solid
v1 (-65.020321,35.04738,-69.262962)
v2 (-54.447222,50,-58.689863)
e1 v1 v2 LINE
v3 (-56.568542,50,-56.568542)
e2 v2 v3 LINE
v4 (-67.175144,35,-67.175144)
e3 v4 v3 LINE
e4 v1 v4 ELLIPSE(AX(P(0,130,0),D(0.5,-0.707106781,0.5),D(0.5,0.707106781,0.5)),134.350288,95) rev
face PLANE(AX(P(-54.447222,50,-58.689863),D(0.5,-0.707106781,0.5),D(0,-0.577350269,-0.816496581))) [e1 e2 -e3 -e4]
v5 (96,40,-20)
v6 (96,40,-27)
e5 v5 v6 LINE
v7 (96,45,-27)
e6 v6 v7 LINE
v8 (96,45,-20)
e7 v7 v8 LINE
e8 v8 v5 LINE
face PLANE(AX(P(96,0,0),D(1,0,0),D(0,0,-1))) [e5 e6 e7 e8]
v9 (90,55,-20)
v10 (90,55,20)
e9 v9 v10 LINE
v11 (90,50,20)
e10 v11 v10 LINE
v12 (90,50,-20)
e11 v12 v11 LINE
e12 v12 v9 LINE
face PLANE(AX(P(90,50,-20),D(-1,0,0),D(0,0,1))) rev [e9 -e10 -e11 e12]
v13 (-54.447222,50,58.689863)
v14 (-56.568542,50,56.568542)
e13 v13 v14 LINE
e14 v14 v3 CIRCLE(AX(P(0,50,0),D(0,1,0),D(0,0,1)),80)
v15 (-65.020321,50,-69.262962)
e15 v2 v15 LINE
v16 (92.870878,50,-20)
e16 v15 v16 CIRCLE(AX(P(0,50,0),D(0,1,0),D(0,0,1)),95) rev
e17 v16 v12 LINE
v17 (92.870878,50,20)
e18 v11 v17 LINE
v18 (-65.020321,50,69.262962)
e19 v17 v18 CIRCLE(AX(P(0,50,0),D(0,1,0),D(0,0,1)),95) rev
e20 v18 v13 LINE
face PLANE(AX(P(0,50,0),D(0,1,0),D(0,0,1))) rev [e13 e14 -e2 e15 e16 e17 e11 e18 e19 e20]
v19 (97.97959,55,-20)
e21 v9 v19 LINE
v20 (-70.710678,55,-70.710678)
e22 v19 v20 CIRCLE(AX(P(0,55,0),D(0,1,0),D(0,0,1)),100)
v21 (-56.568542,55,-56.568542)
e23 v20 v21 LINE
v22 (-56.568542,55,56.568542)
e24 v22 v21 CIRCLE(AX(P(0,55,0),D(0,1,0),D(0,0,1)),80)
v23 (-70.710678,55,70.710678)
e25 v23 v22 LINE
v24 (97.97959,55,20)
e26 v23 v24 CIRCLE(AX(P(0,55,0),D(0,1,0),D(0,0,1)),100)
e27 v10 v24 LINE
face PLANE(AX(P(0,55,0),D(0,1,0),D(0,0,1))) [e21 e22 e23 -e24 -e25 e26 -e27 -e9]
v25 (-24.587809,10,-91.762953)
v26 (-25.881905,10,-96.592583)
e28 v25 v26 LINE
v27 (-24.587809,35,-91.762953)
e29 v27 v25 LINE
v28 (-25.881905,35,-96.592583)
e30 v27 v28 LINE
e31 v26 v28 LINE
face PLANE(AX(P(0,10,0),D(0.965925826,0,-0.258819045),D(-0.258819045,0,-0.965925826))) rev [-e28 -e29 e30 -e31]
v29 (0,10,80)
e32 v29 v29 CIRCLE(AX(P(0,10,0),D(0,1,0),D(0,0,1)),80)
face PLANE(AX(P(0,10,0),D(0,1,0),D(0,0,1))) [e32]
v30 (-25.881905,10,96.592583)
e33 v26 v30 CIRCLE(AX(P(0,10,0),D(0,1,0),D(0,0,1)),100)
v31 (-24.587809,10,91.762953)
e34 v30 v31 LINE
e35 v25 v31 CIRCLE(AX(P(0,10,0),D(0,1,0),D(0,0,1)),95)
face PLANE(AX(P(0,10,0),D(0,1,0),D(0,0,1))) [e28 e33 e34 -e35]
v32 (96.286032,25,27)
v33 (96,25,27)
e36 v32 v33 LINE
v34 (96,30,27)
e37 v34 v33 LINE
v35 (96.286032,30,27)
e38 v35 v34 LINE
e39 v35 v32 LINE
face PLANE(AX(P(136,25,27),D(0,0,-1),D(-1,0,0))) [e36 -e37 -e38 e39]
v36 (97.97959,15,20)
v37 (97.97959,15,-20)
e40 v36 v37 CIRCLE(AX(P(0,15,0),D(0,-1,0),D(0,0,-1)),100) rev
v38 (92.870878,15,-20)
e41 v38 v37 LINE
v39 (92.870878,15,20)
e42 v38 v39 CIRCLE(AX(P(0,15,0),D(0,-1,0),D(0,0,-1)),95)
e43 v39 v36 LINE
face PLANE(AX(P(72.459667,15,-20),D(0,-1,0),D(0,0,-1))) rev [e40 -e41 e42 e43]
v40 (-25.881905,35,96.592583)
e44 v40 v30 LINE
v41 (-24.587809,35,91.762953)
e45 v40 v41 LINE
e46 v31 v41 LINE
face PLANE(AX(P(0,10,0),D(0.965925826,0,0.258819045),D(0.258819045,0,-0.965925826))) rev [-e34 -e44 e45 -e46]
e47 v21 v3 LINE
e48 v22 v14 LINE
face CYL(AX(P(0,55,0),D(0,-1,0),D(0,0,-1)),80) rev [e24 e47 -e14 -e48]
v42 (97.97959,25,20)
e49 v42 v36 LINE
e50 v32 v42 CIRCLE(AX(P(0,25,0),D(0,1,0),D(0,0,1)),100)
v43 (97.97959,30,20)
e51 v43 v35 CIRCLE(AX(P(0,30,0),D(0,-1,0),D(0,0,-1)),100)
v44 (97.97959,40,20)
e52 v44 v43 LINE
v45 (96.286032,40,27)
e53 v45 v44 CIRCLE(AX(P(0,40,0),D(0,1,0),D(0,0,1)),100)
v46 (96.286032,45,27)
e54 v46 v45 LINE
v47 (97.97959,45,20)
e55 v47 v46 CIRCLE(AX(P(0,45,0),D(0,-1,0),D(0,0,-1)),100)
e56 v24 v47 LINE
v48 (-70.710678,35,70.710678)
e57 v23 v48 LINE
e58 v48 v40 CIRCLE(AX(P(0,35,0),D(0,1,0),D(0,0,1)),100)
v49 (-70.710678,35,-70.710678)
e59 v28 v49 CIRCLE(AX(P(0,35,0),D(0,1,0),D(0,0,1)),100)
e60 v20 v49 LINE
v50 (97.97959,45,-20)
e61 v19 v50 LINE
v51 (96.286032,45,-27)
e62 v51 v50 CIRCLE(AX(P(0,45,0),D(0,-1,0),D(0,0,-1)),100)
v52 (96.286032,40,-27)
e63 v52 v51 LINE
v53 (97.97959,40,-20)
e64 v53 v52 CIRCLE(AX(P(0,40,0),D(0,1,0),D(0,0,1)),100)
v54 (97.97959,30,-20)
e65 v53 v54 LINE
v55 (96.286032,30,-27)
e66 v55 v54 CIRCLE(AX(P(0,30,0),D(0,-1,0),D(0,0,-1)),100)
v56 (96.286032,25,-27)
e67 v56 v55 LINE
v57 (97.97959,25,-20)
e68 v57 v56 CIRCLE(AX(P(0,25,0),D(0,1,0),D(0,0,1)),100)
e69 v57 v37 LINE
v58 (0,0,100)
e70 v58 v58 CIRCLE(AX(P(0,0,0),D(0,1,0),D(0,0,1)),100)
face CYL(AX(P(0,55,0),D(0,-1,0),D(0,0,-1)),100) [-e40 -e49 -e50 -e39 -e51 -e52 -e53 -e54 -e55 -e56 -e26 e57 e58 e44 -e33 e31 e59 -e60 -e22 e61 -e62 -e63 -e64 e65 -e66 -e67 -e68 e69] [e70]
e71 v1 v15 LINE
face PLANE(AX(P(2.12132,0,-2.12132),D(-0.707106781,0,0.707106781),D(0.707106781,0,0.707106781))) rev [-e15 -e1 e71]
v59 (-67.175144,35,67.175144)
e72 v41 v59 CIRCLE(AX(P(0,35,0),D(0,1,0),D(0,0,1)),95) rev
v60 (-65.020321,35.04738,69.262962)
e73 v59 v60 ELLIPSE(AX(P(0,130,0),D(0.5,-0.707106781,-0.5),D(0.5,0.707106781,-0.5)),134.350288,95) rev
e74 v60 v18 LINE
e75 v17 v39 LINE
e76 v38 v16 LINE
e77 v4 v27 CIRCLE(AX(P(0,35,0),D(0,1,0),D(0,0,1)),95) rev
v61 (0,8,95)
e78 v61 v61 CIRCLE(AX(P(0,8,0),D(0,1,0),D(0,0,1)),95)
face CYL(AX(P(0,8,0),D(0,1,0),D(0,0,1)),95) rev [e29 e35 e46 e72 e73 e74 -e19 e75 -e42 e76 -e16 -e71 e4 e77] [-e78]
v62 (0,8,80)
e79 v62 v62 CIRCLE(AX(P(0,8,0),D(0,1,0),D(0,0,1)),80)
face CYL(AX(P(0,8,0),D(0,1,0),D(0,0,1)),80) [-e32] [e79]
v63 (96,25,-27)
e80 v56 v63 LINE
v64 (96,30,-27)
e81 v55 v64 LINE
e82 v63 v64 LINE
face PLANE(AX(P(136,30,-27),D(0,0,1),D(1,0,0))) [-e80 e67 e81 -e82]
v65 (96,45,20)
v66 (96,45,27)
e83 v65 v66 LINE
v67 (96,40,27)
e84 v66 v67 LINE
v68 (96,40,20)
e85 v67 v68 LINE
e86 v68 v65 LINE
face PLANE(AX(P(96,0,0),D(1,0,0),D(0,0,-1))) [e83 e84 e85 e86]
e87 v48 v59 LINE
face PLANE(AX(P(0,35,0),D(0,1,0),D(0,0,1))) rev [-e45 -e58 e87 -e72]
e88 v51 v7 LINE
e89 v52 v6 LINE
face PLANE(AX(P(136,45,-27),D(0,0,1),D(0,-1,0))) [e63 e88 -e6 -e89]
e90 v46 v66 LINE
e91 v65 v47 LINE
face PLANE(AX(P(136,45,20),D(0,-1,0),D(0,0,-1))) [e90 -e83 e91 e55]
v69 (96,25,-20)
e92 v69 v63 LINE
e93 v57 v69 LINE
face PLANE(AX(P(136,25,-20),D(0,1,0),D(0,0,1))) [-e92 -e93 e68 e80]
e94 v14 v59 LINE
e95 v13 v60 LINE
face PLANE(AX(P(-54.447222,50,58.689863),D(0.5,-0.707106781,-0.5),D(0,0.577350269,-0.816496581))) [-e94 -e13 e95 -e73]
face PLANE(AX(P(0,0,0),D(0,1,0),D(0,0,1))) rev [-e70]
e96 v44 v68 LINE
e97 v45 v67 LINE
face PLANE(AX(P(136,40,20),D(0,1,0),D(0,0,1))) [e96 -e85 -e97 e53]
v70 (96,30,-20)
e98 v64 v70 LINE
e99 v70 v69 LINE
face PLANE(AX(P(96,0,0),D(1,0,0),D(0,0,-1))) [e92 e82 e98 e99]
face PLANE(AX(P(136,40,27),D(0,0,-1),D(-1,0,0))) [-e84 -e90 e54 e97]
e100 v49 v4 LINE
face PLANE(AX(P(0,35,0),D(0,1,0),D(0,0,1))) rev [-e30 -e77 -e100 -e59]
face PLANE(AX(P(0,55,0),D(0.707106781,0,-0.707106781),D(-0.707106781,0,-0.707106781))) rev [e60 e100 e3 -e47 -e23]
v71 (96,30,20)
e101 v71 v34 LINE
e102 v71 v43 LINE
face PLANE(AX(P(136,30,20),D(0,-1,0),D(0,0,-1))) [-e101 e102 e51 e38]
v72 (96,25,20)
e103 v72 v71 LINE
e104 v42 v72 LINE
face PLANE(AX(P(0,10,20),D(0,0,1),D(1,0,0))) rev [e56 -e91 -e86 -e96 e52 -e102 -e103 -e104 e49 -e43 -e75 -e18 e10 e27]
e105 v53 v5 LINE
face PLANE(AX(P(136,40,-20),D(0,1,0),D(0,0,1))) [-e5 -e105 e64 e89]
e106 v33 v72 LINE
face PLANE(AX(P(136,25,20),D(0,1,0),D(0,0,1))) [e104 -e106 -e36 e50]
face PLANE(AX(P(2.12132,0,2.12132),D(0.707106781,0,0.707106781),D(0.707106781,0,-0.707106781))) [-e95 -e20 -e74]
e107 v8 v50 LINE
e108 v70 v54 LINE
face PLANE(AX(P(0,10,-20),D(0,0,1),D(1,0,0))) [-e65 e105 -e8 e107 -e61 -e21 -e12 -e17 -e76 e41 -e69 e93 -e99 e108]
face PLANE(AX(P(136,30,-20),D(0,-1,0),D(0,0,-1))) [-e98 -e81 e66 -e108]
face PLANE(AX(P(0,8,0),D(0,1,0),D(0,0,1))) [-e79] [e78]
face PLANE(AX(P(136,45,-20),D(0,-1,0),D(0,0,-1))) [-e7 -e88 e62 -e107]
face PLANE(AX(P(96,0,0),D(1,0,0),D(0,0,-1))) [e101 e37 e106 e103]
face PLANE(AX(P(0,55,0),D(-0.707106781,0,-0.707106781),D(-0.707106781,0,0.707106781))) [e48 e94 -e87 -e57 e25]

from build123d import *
from build123d.topology import SkipClean

# Parameters (mm, degrees)
SKETCH1_R            = 100
BOSS_EXTRUDE1_DEPTH  = 10
SKETCH2_R            = 95
SKETCH2_R_2          = 80
CUT_EXTRUDE1_DEPTH   = 2
BOSS_EXTRUDE2_DEPTH  = 40
BOSS_EXTRUDE3_DEPTH  = 5
CUT_EXTRUDE2_START   = -5
SKETCH5_W            = 50
SKETCH5_H            = 40
CUT_EXTRUDE2_DEPTH   = 40
BOSS_EXTRUDE4_START  = -45
BOSS_EXTRUDE4_DEPTH  = 45
SKETCH8_W            = 40
SKETCH8_H            = 5
BOSS_EXTRUDE5_DEPTH  = 55
CUT_EXTRUDE3_START   = -10
SKETCH10_W           = 8.429508811
SKETCH10_H           = 40
CUT_EXTRUDE3_DEPTH   = 10
BOSS_EXTRUDE6_START  = 18.2
BOSS_EXTRUDE6_DEPTH  = 2
BOSS_EXTRUDE7_START  = 18.1
BOSS_EXTRUDE7_DEPTH  = 15
SKETCH13_W           = 20.653307815
SKETCH13_H           = 40
CUT_EXTRUDE4_DEPTH   = 5
BOSS_EXTRUDE8_DEPTH  = 17
BOSS_EXTRUDE9_DEPTH  = 3
BOSS_EXTRUDE10_DEPTH = 3
SKETCH18_W           = 11.98170237
SKETCH18_H           = 40
CUT_EXTRUDE5_DEPTH   = 5
CUT_EXTRUDE6_START   = -20
CUT_EXTRUDE6_DEPTH   = 25
CUT_EXTRUDE7_START   = -200
CUT_EXTRUDE7_DEPTH   = 200
CUT_EXTRUDE8_DEPTH   = 40
CUT_EXTRUDE9_START   = 6
SKETCH23_W           = 7
SKETCH23_H           = 5
CUT_EXTRUDE9_DEPTH   = 40


with BuildPart() as part:
    # Sketch1 → Boss-Extrude1 (new body)
    with BuildSketch(Plane(origin=(0, 0, 0), x_dir=(1, 0, 0), z_dir=(0, 1, 0))):
        with Locations(Location((0, 0, 0), (0, 0, 270))):
            Circle(SKETCH1_R)
    extrude(amount=BOSS_EXTRUDE1_DEPTH)

    # Sketch2 → Cut-Extrude1 (cut)
    with BuildSketch(Plane(origin=(0, 10, 0), x_dir=(1, 0, 0), z_dir=(0, 1, 0))):
        with Locations(Location((0, 0, 0), (0, 0, 270))):
            Circle(SKETCH2_R)
        with Locations(Location((0, 0, 0), (0, 0, 270))):
            Circle(SKETCH2_R_2, mode=Mode.SUBTRACT)
    extrude(amount=-CUT_EXTRUDE1_DEPTH, mode=Mode.SUBTRACT)

    # Sketch3 → Boss-Extrude2 (add)
    with SkipClean():  # the faces are left unmerged after this step: merging them gives an invalid solid
        with BuildSketch(Plane(origin=(0, 10, 0), x_dir=(1, 0, 0), z_dir=(0, 1, 0))):
            with BuildLine():
                Line((-67.175144213, 67.175144213), (-70.710678119, 70.710678119))
                ThreePointArc((-70.710678119, 70.710678119), (100, 0), (-70.710678119, -70.710678119))
                Line((-70.710678119, -70.710678119), (-67.175144213, -67.175144213))
                ThreePointArc((-67.175144213, -67.175144213), (95, 0), (-67.175144213, 67.175144213))
            make_face()
        extrude(amount=BOSS_EXTRUDE2_DEPTH)

    # Sketch5 → Cut-Extrude2 (cut)
    with SkipClean():  # the faces are left unmerged after this step: merging them gives an invalid solid
        with BuildSketch(Plane(origin=(0, 55, 0), x_dir=(1, 0, 0), z_dir=(0, 1, 0)).offset(CUT_EXTRUDE2_START)):
            with Locations((102.459666924, 0)):
                Rectangle(SKETCH5_W, SKETCH5_H)
        extrude(amount=-CUT_EXTRUDE2_DEPTH, mode=Mode.SUBTRACT)



with BuildPart() as body_2:
    # Sketch4 → Boss-Extrude3 (new body)
    with BuildSketch(Plane(origin=(0, 50, 0), x_dir=(1, 0, 0), z_dir=(0, 1, 0))):
        with BuildLine():
            ThreePointArc((-67.175144213, -67.175144213), (95, 0), (-67.175144213, 67.175144213))
            Line((-67.175144213, 67.175144213), (-56.568542495, 56.568542495))
            ThreePointArc((-56.568542495, 56.568542495), (30.614674589, 73.910362601), (80, 0))
            ThreePointArc((80, 0), (30.614674589, -73.910362601), (-56.568542495, -56.568542495))
            Line((-56.568542495, -56.568542495), (-67.175144213, -67.175144213))
        make_face()
        with BuildLine():
            Line((-70.710678119, 70.710678119), (-67.175144213, 67.175144213))
            ThreePointArc((-67.175144213, 67.175144213), (95, 0), (-67.175144213, -67.175144213))
            Line((-67.175144213, -67.175144213), (-70.710678119, -70.710678119))
            ThreePointArc((-70.710678119, -70.710678119), (100, 0), (-70.710678119, 70.710678119))
        make_face()
    extrude(amount=BOSS_EXTRUDE3_DEPTH)


with BuildPart() as part_1:
    with SkipClean():  # the faces are left unmerged after this step: merging them gives an invalid solid
        add(part.part)

        add(body_2.part)  # Boss-Extrude4 merges body 2
        # Sketch7 → Boss-Extrude4 (add)
        with BuildSketch(Plane(origin=(0, 55, 0), x_dir=(1, 0, 0), z_dir=(0, 1, 0)).offset(BOSS_EXTRUDE4_START)):
            with BuildLine():
                ThreePointArc((96.824583655, 25), (97.434164903, 22.507410108), (97.979589711, 20))
                Line((97.979589711, 20), (127.459666924, 20))
                Line((127.459666924, 20), (127.459666924, -20))
                Line((127.459666924, -20), (97.979589711, -20))
                ThreePointArc((97.979589711, -20), (97.434164903, -22.507410108), (96.824583655, -25))
                Line((96.824583655, -25), (132.459666924, -25))
                Line((132.459666924, -25), (132.459666924, 25))
                Line((132.459666924, 25), (96.824583655, 25))
            make_face()
        extrude(amount=BOSS_EXTRUDE4_DEPTH)

    # Sketch8 → Boss-Extrude5 (add)
    with SkipClean():  # the faces are left unmerged after this step: merging them gives an invalid solid
        with BuildSketch(Plane.ZY.offset(-127.459666924)):
            with Locations((0, 12.5)):
                Rectangle(SKETCH8_W, SKETCH8_H)
        extrude(amount=BOSS_EXTRUDE5_DEPTH)

    # Sketch10 → Cut-Extrude3 (cut)
    with SkipClean():  # the faces are left unmerged after this step: merging them gives an invalid solid
        with BuildSketch(Plane.XZ.offset(CUT_EXTRUDE3_START)):
            with Locations((88.6561237, 0)):
                Rectangle(SKETCH10_W, SKETCH10_H)
            with BuildLine():
                Line((92.870878105, -20), (92.870878105, 20))
                ThreePointArc((92.870878105, 20), (95, 0), (92.870878105, -20))
            make_face()
        extrude(amount=-CUT_EXTRUDE3_DEPTH, mode=Mode.SUBTRACT)

    # Sketch13 → Cut-Extrude4 (cut)
    with SkipClean():  # the faces are left unmerged after this step: merging them gives an invalid solid
        with BuildSketch(Plane(origin=(0, 55, 0), x_dir=(1, 0, 0), z_dir=(0, 1, 0))):
            with Locations((100.326653908, 0)):
                Rectangle(SKETCH13_W, SKETCH13_H)
        extrude(amount=-CUT_EXTRUDE4_DEPTH, mode=Mode.SUBTRACT)



with BuildPart() as body_2_2:
    # Sketch11 → Boss-Extrude6 (new body)
    with BuildSketch(Plane(origin=(0, 15, 0), x_dir=(1, 0, 0), z_dir=(0, 1, 0)).offset(BOSS_EXTRUDE6_START)):
        with BuildLine():
            Line((110.459666924, 8), (95.459666924, 8))
            Line((95.459666924, 8), (95.459666924, 3.5))
            Line((95.459666924, 3.5), (100.359666924, 3.5))
            ThreePointArc((100.359666924, 3.5), (103.859666924, 0), (100.359666924, -3.5))
            Line((100.359666924, -3.5), (95.459666924, -3.5))
            Line((95.459666924, -3.5), (95.459666924, -8))
            Line((95.459666924, -8), (110.459666924, -8))
            Line((110.459666924, -8), (110.459666924, 8))
        make_face()
    extrude(amount=BOSS_EXTRUDE6_DEPTH)

    # Sketch12 → Boss-Extrude7 (add)
    with BuildSketch(Plane(origin=(0, 15, 0), x_dir=(1, 0, 0), z_dir=(0, 1, 0)).offset(BOSS_EXTRUDE7_START)):
        Polygon((95.459666924, -10), (95.459666924, -8), (110.459666924, -8), (110.459666924, 8), (95.459666924, 8), (95.459666924, 10), (112.459666924, 10), (112.459666924, -10), align=None)
    extrude(amount=BOSS_EXTRUDE7_DEPTH)


with BuildPart() as part_2:
    with SkipClean():  # the faces are left unmerged after this step: merging them gives an invalid solid
        add(part_1.part)

        add(body_2_2.part)  # Boss-Extrude8 merges body 2 2
        # Sketch15 → Boss-Extrude8 (add)
        with BuildSketch(Plane(origin=(112.459666924, 0, 0), x_dir=(0, 0, -1), z_dir=(1, 0, 0))):
            Polygon((-8.249409199, 33.1), (-18.249409392, 15), (-20, 15), (-20, 15.967177607), (-10, 34.067177257), align=None)
            Polygon((10, 34.067177257), (20, 15.967177607), (20, 15), (18.249409392, 15), (8.249409199, 33.1), align=None)
        extrude(amount=-BOSS_EXTRUDE8_DEPTH)

    # Sketch16 → Boss-Extrude9 (add)
    with BuildSketch(Plane(origin=(0, 0, 0), x_dir=(0.7071067811865464, 0, 0.7071067811865487), z_dir=(-0.7071067811865487, 0, 0.7071067811865464))):
        Polygon((-80, 50), (-95, 35), (-95, 50), align=None)
    extrude(amount=-BOSS_EXTRUDE9_DEPTH)

    # Sketch17 → Boss-Extrude10 (add)
    with BuildSketch(Plane(origin=(0, 0, 0), x_dir=(-0.7071067811865475, 0, 0.7071067811865477), z_dir=(-0.7071067811865477, 0, -0.7071067811865475))):
        Polygon((80, 50), (95, 35), (95, 50), align=None)
    extrude(amount=-BOSS_EXTRUDE10_DEPTH)

    # Sketch18 → Cut-Extrude5 (cut)
    with BuildSketch(Plane(origin=(0, 15, 0), x_dir=(1, 0, 0), z_dir=(0, 1, 0))):
        with Locations((78.450518109, 0)):
            Rectangle(SKETCH18_W, SKETCH18_H)
    extrude(amount=-CUT_EXTRUDE5_DEPTH, mode=Mode.SUBTRACT)

    # Sketch20 → Cut-Extrude6 (cut)
    with BuildSketch(Plane(origin=(0, 55, 0), x_dir=(1, 0, 0), z_dir=(0, 1, 0)).offset(CUT_EXTRUDE6_START)):
        with BuildLine():
            Line((0, 0), (-31.757481462, 118.520534337))
            ThreePointArc((-31.757481462, 118.520534337), (-122.701486088, 0), (-31.757481462, -118.520534337))
            Line((-31.757481462, -118.520534337), (0, 0))
        make_face()
    extrude(amount=-CUT_EXTRUDE6_DEPTH, mode=Mode.SUBTRACT)

    # Sketch21 → Cut-Extrude7 (cut)
    with BuildSketch(Plane(origin=(0, 55, 0), x_dir=(1, 0, 0), z_dir=(0, 1, 0)).offset(CUT_EXTRUDE7_START)):
        with BuildLine():
            Line((96.824583655, 25), (132.459666924, 25))
            Line((132.459666924, 25), (132.459666924, -25))
            Line((132.459666924, -25), (96.824583655, -25))
            ThreePointArc((96.824583655, -25), (100, 0), (96.824583655, 25))
        make_face()
    extrude(amount=CUT_EXTRUDE7_DEPTH, mode=Mode.SUBTRACT)

    # Sketch22 → Cut-Extrude8 (cut)
    with BuildSketch(Plane(origin=(0, 55, 0), x_dir=(1, 0, 0), z_dir=(0, 1, 0))):
        Polygon((95.459666924, 20), (95.459666924, -20), (121.621169639, -20), (97.979589711, 20), align=None)
    extrude(amount=-CUT_EXTRUDE8_DEPTH, mode=Mode.SUBTRACT)

    # Sketch23 → Cut-Extrude9 (cut)
    with SkipClean():  # the faces are left unmerged after this step: merging them gives an invalid solid
        with BuildSketch(Plane(origin=(90, 0, 0), x_dir=(0, 0, -1), z_dir=(1, 0, 0)).offset(CUT_EXTRUDE9_START)):
            with Locations((-23.5, 42.5)):
                Rectangle(SKETCH23_W, SKETCH23_H)
            with Locations((-23.5, 27.5)):
                Rectangle(SKETCH23_W, SKETCH23_H)
            with Locations((23.5, 27.5)):
                Rectangle(SKETCH23_W, SKETCH23_H)
            with Locations((23.5, 42.5)):
                Rectangle(SKETCH23_W, SKETCH23_H)
        extrude(amount=CUT_EXTRUDE9_DEPTH, mode=Mode.SUBTRACT)


solid = part_2.part
